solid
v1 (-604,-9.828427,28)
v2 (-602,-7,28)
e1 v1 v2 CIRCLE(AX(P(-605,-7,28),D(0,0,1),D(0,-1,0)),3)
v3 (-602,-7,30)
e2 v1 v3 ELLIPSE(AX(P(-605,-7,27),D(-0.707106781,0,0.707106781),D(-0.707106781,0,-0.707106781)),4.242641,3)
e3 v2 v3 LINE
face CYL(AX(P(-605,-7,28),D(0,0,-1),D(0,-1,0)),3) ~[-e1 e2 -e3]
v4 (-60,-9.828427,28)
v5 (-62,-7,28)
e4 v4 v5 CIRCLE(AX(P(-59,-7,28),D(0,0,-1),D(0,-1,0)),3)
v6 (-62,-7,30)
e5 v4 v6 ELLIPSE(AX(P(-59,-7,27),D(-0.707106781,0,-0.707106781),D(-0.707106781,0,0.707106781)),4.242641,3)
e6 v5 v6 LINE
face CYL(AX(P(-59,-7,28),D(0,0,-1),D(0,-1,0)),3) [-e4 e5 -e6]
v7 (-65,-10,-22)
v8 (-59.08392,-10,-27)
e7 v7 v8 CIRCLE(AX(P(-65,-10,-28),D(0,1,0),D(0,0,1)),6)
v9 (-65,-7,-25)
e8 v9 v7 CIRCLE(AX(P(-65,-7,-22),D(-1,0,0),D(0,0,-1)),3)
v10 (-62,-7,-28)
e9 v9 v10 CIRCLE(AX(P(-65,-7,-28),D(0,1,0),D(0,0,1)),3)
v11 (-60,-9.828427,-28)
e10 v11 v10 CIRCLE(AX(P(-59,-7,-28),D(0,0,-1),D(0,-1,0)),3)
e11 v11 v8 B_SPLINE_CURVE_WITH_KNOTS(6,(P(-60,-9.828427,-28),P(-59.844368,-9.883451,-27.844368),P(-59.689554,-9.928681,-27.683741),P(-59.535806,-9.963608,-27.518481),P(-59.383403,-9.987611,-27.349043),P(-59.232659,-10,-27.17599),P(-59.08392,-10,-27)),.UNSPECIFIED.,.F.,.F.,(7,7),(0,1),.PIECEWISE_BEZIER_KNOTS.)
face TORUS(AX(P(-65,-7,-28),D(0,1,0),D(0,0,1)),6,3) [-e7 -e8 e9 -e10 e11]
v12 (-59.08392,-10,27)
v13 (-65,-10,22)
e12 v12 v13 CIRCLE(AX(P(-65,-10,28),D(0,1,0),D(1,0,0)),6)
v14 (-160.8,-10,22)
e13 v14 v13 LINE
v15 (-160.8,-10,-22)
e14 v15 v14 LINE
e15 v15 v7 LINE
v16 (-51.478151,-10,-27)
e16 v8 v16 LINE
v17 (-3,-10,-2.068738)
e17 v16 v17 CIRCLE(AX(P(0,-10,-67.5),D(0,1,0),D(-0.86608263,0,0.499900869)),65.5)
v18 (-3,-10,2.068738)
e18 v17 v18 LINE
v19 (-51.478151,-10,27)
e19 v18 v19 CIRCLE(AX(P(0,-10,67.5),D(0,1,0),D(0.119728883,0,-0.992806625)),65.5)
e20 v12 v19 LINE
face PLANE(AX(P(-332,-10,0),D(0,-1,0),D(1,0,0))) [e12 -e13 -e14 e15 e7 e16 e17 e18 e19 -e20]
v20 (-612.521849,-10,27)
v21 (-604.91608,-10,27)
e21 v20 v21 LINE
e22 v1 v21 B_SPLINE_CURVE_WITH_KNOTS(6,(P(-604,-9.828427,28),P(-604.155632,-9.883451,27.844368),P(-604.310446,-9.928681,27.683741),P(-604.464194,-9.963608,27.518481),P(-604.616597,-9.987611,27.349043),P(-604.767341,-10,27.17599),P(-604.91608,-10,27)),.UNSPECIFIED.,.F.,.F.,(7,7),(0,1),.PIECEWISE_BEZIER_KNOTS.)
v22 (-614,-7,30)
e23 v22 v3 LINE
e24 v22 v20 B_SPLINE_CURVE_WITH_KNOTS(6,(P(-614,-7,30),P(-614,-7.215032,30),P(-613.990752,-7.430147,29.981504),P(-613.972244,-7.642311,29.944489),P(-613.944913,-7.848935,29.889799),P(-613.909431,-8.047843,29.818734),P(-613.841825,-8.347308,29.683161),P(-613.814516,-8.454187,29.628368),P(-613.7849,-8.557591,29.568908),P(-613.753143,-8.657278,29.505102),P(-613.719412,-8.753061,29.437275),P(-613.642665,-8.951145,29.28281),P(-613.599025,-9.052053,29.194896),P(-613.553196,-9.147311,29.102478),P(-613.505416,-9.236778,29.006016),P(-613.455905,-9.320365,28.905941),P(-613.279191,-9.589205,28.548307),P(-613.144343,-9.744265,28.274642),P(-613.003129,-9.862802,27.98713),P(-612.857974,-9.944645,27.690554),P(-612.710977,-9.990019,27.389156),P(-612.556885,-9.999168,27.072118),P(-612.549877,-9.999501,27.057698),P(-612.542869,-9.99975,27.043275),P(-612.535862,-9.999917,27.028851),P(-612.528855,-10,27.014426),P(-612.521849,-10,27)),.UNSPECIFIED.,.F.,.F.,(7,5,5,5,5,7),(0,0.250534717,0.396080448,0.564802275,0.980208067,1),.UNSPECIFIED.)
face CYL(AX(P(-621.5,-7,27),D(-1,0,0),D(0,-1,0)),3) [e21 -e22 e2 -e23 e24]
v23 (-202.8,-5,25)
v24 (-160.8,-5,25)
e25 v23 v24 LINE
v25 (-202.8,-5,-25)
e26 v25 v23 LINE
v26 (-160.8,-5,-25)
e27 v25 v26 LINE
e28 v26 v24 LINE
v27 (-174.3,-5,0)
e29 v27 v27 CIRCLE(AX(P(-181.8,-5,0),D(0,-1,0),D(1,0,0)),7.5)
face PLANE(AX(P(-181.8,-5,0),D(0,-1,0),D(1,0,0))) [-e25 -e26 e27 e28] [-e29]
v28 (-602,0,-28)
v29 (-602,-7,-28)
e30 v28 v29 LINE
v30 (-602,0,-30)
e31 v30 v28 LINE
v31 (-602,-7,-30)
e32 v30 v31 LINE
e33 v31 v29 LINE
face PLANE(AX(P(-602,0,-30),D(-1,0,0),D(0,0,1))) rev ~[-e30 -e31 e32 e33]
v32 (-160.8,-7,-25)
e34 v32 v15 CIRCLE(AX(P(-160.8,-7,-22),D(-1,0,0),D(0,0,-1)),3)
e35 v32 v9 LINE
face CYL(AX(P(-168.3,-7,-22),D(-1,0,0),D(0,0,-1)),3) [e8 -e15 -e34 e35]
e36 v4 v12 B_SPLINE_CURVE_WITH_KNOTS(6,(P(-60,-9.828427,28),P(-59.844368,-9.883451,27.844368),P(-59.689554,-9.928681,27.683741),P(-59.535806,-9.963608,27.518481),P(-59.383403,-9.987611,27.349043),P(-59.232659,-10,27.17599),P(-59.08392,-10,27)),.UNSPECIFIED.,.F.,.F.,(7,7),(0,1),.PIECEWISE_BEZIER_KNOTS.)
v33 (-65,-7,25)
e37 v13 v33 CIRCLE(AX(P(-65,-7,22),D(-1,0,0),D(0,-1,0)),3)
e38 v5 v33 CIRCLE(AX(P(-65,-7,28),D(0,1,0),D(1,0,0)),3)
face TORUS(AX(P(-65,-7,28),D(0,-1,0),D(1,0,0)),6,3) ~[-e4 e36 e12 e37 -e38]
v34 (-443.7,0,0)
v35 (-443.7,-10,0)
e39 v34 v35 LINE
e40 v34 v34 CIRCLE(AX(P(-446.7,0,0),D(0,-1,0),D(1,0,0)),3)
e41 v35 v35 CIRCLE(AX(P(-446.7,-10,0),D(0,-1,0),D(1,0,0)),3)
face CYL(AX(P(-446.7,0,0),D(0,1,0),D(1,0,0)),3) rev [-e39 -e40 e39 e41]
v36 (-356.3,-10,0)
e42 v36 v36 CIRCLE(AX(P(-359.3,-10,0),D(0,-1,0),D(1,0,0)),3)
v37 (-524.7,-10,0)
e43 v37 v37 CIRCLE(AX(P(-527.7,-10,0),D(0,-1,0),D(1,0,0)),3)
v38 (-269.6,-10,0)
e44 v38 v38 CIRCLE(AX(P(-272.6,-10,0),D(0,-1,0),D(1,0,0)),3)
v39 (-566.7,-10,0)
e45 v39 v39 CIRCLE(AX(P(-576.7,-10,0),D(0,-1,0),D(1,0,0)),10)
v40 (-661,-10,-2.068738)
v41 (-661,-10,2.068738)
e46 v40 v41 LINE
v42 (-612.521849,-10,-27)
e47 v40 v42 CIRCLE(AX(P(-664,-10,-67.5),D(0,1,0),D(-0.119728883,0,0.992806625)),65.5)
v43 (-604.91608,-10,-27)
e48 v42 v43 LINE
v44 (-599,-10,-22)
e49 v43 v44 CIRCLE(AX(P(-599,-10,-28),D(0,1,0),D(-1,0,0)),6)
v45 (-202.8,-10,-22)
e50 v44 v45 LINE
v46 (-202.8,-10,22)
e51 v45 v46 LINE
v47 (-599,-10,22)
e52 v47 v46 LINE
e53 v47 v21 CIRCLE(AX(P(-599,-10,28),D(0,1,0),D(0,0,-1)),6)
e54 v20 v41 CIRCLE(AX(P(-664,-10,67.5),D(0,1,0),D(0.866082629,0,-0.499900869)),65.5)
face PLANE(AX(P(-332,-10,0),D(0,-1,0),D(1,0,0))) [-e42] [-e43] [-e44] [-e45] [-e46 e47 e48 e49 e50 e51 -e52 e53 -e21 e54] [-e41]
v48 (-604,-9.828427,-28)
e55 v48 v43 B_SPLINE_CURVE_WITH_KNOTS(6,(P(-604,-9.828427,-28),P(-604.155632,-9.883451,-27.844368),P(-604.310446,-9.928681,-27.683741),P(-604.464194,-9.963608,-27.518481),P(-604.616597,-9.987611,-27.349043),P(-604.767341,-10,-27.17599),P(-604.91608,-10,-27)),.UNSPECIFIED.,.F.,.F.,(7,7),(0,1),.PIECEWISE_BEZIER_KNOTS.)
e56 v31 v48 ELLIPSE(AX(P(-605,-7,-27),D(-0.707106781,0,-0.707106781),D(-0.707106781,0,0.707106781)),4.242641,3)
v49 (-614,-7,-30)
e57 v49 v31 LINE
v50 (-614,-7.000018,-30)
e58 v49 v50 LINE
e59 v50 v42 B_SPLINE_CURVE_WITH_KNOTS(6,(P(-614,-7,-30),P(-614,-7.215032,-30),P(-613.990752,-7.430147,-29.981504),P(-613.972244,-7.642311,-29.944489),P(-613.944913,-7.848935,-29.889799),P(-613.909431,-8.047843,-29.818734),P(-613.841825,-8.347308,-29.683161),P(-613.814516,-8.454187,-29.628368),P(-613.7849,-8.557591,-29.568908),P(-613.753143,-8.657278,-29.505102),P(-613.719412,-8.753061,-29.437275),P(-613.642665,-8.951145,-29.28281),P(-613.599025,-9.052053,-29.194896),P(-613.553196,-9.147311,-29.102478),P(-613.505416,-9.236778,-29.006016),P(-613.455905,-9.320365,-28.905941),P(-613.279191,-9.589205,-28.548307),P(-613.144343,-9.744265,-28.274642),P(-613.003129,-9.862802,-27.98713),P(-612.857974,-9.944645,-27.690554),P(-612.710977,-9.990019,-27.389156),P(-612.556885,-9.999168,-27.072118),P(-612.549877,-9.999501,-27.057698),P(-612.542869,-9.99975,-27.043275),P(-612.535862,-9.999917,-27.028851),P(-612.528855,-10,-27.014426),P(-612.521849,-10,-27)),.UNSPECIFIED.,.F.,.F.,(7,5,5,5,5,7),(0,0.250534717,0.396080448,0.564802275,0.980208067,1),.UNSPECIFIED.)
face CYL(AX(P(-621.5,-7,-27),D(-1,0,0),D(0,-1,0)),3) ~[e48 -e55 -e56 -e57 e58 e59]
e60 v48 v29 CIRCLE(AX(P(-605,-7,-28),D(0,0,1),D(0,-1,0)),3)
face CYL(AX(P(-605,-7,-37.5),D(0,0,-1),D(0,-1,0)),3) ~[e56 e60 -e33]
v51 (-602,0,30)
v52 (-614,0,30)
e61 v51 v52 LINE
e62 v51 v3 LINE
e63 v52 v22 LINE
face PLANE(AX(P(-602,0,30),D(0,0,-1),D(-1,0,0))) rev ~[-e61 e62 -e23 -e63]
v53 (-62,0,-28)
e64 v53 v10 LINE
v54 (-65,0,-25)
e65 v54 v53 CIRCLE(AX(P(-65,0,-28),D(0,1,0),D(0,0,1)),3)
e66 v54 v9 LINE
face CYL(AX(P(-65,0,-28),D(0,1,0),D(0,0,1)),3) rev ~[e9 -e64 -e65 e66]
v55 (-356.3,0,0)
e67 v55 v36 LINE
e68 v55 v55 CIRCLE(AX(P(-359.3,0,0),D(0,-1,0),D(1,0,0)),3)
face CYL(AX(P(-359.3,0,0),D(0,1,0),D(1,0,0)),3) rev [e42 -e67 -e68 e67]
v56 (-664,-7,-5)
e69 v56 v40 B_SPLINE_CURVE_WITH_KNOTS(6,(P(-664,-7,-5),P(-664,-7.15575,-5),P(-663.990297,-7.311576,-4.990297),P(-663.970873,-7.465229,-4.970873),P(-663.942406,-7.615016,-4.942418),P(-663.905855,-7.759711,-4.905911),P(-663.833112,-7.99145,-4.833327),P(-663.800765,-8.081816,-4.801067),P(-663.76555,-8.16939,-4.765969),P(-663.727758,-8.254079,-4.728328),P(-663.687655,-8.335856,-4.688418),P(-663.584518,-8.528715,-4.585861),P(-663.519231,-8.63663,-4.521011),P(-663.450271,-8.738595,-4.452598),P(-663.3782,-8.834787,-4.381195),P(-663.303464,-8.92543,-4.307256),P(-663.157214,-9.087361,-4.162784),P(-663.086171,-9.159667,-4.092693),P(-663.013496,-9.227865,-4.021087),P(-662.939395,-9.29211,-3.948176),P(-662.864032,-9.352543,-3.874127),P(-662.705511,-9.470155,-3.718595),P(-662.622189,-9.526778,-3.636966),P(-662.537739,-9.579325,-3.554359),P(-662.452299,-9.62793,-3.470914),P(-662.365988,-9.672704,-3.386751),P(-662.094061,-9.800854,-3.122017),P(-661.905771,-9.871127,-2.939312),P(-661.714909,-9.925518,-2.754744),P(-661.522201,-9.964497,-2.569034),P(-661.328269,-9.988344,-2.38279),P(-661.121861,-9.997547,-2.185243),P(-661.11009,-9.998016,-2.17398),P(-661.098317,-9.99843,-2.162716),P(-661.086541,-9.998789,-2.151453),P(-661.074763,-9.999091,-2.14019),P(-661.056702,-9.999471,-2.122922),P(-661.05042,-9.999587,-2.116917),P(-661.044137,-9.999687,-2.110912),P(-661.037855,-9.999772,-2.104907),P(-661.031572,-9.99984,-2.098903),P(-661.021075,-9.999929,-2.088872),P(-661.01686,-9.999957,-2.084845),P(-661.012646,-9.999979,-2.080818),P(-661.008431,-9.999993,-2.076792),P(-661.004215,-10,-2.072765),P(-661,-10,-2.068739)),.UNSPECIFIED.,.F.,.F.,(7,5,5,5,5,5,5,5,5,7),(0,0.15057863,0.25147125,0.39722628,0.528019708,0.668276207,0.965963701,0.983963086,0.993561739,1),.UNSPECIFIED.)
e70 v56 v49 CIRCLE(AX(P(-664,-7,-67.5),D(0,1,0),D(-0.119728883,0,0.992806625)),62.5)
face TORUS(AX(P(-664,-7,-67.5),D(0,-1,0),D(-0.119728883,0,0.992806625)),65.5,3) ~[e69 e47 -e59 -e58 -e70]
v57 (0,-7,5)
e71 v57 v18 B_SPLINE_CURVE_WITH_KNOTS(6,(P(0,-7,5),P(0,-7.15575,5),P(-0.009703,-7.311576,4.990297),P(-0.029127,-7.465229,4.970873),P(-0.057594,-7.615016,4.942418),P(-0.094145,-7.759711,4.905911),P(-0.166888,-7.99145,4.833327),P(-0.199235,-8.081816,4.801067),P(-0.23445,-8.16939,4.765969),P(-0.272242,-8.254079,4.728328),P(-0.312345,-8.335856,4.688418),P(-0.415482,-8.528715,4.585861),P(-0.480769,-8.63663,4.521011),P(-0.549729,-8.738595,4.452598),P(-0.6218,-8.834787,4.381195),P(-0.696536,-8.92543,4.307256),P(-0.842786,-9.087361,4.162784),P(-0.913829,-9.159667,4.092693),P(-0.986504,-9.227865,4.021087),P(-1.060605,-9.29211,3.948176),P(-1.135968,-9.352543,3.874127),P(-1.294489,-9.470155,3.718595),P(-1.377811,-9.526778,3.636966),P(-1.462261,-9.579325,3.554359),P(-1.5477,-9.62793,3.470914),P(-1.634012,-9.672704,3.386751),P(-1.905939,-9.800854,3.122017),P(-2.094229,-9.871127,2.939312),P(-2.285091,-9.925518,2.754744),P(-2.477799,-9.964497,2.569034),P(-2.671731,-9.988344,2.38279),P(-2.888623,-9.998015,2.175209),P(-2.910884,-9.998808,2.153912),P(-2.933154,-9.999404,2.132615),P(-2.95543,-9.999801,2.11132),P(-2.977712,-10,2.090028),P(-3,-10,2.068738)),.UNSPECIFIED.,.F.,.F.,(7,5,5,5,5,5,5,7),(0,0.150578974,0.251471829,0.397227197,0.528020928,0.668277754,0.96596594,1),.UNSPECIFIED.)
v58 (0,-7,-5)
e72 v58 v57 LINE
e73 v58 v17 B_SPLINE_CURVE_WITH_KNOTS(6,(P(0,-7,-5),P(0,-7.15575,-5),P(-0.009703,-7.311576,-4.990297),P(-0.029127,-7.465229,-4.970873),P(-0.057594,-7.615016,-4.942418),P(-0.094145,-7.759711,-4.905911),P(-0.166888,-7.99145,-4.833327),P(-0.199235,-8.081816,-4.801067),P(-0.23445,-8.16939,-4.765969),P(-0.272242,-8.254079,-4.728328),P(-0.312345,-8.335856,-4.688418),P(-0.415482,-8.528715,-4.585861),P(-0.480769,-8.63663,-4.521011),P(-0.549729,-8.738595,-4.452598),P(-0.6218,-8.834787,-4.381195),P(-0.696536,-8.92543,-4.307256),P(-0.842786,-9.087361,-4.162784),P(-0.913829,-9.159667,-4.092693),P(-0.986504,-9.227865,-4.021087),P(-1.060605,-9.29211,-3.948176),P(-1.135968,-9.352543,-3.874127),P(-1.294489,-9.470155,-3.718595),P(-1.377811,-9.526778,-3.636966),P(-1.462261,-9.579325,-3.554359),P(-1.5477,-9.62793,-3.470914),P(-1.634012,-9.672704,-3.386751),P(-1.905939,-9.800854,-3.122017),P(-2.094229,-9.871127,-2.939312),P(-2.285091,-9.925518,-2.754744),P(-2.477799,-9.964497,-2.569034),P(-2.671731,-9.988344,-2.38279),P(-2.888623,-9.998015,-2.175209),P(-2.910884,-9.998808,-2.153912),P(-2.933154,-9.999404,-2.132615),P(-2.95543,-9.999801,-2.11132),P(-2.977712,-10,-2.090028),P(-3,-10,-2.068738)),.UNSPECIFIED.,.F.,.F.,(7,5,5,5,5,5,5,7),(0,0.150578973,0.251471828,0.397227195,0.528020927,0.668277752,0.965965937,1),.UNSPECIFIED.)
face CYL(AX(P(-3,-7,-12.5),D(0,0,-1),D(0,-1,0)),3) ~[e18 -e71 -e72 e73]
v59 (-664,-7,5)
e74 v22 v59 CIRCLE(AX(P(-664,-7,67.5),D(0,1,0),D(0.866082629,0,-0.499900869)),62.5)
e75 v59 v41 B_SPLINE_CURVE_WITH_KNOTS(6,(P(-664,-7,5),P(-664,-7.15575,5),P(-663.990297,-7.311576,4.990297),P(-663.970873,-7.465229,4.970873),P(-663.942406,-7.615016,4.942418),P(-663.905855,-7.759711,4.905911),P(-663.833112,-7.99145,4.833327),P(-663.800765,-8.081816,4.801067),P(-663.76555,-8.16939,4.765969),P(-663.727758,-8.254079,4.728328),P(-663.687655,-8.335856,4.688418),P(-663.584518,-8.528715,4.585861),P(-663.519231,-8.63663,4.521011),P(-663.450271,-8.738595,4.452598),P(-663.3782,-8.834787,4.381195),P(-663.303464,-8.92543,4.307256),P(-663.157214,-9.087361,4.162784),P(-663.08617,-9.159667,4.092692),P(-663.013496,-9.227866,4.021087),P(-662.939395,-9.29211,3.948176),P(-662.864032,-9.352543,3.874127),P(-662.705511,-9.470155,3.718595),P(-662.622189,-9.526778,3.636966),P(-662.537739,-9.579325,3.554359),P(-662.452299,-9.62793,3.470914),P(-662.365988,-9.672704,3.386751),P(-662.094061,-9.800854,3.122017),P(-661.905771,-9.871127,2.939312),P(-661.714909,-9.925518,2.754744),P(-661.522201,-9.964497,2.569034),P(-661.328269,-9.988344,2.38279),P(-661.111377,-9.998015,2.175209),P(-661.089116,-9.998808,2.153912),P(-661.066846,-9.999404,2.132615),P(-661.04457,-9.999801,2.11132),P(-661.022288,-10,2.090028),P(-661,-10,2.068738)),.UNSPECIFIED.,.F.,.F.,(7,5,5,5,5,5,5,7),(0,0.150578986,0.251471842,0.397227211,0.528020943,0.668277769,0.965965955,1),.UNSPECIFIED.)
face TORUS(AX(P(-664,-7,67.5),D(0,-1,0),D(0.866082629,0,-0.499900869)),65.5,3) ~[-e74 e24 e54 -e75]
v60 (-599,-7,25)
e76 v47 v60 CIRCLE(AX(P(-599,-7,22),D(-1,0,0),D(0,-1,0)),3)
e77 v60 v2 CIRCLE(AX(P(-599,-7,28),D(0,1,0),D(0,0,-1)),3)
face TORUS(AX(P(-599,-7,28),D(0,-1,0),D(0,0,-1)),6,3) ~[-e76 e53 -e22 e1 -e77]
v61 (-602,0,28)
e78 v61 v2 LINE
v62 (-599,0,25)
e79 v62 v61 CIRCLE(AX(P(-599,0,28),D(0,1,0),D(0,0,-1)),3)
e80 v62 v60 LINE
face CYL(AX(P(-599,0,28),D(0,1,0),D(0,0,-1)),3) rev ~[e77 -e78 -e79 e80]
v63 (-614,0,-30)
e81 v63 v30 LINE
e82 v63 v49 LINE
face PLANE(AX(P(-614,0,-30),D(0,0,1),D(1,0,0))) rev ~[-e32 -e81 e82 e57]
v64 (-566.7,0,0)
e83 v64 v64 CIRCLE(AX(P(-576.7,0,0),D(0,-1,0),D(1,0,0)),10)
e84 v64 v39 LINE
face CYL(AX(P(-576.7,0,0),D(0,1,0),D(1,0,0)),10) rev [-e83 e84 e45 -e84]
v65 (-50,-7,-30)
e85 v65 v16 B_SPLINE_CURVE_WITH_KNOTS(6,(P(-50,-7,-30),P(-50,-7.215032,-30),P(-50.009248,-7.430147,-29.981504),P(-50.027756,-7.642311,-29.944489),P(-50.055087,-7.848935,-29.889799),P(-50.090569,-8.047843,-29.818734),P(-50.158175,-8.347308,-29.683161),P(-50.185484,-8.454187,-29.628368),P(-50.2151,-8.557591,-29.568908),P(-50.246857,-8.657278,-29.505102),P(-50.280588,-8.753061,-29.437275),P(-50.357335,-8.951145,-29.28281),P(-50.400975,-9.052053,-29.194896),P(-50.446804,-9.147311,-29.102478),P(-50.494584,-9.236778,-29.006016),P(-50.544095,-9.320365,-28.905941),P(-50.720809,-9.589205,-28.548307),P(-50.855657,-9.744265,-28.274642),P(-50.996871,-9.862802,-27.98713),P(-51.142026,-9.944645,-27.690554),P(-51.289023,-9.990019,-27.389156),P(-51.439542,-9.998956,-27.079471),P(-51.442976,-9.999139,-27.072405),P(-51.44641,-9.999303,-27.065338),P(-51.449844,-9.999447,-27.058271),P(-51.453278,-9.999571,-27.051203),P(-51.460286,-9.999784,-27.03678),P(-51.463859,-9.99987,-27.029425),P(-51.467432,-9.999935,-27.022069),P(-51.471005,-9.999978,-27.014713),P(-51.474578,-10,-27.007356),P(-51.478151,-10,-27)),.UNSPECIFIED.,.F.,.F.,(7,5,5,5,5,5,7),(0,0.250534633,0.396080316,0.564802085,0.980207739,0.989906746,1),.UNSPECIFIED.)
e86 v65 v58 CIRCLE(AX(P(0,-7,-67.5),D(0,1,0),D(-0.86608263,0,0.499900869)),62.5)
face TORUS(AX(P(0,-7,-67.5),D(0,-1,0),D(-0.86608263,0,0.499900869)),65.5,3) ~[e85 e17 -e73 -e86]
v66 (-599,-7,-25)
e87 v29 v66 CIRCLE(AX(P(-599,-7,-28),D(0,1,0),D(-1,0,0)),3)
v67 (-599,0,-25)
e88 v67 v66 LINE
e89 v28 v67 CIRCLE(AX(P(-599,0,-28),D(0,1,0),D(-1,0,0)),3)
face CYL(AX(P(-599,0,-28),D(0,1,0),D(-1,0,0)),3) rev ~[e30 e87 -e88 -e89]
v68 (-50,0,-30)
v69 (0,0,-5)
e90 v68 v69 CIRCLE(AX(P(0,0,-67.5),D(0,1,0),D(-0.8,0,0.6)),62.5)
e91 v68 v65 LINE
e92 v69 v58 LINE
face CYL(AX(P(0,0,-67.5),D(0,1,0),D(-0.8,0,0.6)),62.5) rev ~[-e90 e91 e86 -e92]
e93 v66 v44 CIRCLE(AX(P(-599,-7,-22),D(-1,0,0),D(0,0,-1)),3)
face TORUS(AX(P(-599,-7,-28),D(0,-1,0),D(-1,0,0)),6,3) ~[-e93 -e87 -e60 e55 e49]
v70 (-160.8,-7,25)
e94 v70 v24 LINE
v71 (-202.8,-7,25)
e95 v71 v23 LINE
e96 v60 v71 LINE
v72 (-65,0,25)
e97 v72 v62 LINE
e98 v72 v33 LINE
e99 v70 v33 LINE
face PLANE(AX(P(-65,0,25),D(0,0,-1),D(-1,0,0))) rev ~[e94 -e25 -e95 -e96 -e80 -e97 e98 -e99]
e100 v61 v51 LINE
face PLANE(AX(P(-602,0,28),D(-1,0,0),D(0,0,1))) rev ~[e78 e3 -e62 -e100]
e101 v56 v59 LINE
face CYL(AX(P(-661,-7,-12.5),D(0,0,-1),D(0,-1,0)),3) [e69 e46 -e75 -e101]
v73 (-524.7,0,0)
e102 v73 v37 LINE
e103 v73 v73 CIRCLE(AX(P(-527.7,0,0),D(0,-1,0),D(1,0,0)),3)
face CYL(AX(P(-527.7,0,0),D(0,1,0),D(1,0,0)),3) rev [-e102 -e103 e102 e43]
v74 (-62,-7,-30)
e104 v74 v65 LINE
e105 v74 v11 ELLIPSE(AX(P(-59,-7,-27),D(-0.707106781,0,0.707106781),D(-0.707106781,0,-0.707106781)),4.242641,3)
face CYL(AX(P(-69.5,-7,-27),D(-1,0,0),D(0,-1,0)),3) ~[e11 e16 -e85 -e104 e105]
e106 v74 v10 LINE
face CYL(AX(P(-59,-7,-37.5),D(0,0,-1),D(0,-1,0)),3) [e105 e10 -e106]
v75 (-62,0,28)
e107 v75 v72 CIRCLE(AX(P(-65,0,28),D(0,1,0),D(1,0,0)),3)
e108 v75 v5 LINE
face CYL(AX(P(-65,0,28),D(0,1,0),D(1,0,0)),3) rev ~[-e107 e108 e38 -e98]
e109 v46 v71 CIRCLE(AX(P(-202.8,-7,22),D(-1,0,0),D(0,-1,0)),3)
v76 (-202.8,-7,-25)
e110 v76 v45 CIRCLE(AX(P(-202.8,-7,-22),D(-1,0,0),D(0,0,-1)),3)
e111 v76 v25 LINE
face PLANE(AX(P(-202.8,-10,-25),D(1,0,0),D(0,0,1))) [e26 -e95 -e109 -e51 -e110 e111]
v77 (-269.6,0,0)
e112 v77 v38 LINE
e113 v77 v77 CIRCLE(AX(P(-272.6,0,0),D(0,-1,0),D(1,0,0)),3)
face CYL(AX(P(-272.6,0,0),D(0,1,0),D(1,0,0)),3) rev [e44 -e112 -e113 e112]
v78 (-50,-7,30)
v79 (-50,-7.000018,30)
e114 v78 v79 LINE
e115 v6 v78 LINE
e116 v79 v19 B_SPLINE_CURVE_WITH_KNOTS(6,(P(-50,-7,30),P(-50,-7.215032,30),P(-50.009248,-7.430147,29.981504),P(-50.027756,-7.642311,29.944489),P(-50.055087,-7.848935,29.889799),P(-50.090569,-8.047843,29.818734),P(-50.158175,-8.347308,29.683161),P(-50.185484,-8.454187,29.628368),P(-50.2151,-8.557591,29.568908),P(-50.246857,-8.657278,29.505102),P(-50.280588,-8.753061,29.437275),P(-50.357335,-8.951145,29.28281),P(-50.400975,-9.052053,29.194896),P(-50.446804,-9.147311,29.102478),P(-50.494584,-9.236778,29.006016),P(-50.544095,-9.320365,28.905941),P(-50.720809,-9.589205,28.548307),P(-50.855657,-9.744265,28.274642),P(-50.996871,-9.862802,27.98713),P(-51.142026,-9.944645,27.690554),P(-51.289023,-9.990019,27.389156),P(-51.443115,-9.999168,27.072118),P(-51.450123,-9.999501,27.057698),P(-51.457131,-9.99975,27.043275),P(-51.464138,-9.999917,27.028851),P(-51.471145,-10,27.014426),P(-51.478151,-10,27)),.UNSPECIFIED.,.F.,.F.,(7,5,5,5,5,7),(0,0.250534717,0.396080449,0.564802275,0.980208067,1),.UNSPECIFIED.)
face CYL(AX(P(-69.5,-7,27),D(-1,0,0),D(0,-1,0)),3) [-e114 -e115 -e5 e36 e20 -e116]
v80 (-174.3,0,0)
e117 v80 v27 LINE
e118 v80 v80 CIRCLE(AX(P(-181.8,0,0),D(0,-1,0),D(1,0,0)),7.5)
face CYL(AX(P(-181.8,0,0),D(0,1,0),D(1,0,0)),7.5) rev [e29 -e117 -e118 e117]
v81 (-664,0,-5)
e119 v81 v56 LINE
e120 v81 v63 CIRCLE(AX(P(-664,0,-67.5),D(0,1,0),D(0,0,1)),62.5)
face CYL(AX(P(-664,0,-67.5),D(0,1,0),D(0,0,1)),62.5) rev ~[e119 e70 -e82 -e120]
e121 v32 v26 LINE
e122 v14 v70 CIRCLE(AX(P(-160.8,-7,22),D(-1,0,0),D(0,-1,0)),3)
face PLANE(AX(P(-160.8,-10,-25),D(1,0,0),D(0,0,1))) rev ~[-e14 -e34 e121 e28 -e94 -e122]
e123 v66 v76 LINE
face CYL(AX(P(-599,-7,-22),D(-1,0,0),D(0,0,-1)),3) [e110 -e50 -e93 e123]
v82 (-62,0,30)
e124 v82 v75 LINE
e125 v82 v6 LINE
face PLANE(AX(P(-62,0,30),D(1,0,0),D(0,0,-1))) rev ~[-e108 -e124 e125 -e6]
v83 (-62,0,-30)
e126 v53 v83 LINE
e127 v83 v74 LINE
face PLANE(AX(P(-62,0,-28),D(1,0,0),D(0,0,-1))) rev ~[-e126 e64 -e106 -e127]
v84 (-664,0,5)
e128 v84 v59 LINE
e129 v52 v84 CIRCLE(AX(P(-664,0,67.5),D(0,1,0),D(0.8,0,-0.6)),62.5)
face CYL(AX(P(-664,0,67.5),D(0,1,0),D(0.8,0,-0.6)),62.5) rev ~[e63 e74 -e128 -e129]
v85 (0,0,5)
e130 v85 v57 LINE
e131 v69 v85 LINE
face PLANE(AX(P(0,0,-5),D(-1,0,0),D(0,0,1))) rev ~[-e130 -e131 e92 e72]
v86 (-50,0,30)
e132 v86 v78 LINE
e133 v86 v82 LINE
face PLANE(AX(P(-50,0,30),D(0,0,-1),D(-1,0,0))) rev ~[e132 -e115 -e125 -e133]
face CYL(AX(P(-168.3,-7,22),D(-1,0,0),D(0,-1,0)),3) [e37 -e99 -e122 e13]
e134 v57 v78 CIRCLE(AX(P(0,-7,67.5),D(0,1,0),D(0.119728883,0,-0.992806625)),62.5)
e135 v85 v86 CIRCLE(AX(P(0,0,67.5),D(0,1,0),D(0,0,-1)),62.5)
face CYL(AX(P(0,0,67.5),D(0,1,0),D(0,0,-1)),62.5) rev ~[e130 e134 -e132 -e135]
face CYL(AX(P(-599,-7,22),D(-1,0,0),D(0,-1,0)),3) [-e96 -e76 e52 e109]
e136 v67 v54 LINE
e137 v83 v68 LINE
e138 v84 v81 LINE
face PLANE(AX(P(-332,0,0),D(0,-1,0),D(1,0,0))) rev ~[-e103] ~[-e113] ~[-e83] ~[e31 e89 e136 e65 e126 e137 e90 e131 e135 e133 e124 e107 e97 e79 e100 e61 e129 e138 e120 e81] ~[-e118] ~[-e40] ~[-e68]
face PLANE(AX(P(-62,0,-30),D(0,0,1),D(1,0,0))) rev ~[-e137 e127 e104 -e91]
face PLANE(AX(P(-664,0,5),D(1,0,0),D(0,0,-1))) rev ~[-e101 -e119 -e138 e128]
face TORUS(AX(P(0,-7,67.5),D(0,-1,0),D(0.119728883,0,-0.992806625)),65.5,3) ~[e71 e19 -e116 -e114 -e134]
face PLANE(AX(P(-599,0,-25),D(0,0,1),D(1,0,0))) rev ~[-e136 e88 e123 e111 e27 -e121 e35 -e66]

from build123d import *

# Parameters (mm, degrees)
F0_R         = 10
F0_R_2       = 3
F0_R_3       = 7.5
F1_DEPTH     = 10
F2_W         = 42
F2_H         = 50
F2_R         = 7.5
F3_DEPTH     = 5
F4_T1_DEPTH  = 403.7
F4_T3_DEPTH  = 103.3
F4_T5_DEPTH  = 27
F4_T7_DEPTH  = 25
F4_T9_DEPTH  = 27
F4_T11_DEPTH = 9.5
F4_T13_DEPTH = 9.5
F4_T16_ANGLE = 66.8830141294
F4_T18_ANGLE = 66.8830141294
F4_T20_ANGLE = 66.8830141294
F4_T22_ANGLE = 66.8830141294
F4_T24_ANGLE = 90
F4_T26_ANGLE = 90
F4_T28_ANGLE = 90
F4_T30_ANGLE = 90


# Not quite as in the source:
# - a fillet or chamfer that OpenCascade refuses, or shapes differently, is made with other operations: its cross-section is extruded or revolved along the edge and cut away or added


with BuildPart() as f1:
    # F0 (on Front) → F1 (new body)
    with BuildSketch(Plane.XZ):
        with BuildLine():
            Line((0, -5), (0, 0))
            Line((0, 0), (0, 5))
            ThreePointArc((0, 5), (-27.9508497187, 11.5983005625), (-50, 30))
            Line((-50, 30), (-62, 30))
            Line((-62, 30), (-62, 28))
            ThreePointArc((-62, 28), (-62.8786796564, 25.8786796564), (-65, 25))
            Line((-65, 25), (-332, 25))
            Line((-332, 25), (-599, 25))
            ThreePointArc((-599, 25), (-601.1213203436, 25.8786796564), (-602, 28))
            Line((-602, 28), (-602, 30))
            Line((-602, 30), (-614, 30))
            ThreePointArc((-614, 30), (-636.0491502813, 11.5983005625), (-664, 5))
            Line((-664, 5), (-664, 0))
            Line((-664, 0), (-664, -5))
            ThreePointArc((-664, -5), (-636.0491502813, -11.5983005625), (-614, -30))
            Line((-614, -30), (-602, -30))
            Line((-602, -30), (-602, -28))
            ThreePointArc((-602, -28), (-601.1213203436, -25.8786796564), (-599, -25))
            Line((-599, -25), (-332, -25))
            Line((-332, -25), (-65, -25))
            ThreePointArc((-65, -25), (-62.8786796564, -25.8786796564), (-62, -28))
            Line((-62, -28), (-62, -30))
            Line((-62, -30), (-50, -30))
            ThreePointArc((-50, -30), (-27.9508497187, -11.5983005625), (0, -5))
        make_face()
        with Locations((-576.7, 0)):
            Circle(F0_R, mode=Mode.SUBTRACT)
        with Locations((-527.7, 0)):
            Circle(F0_R_2, mode=Mode.SUBTRACT)
        with Locations((-446.7, 0)):
            Circle(F0_R_2, mode=Mode.SUBTRACT)
        with Locations((-359.3, 0)):
            Circle(F0_R_2, mode=Mode.SUBTRACT)
        with Locations((-272.6, 0)):
            Circle(F0_R_2, mode=Mode.SUBTRACT)
        with Locations((-181.8, 0)):
            Circle(F0_R_3, mode=Mode.SUBTRACT)
    extrude(amount=F1_DEPTH)

    # F2 (on face) → F3 (cut)
    with BuildSketch(Plane.XZ.offset(10)):
        with Locations((-181.8, 0)):
            Rectangle(F2_W, F2_H)
        with Locations((-181.8, 0)):
            Circle(F2_R, mode=Mode.SUBTRACT)
    extrude(amount=-F3_DEPTH, mode=Mode.SUBTRACT)

    # F4: fillet of radius 3 on 18 edges, made by hand

    # F4_s2 → F4_t1 (cut)
    with BuildSketch(Plane.YZ.offset(-599)):
        with BuildLine():
            ThreePointArc((-10, 22), (-9.1213203436, 24.1213203436), (-7, 25))
            Line((-7, 25), (-10, 25))
            Line((-10, 25), (-10, 22))
        make_face()
        with BuildLine():
            ThreePointArc((-7, -25), (-9.1213203436, -24.1213203436), (-10, -22))
            Line((-10, -22), (-10, -25))
            Line((-10, -25), (-7, -25))
        make_face()
    extrude(amount=F4_T1_DEPTH, mode=Mode.SUBTRACT)

    # F4_s4 → F4_t3 (cut)
    with BuildSketch(Plane.YZ.offset(-168.3)):
        with BuildLine():
            ThreePointArc((-7, -25), (-9.1213203436, -24.1213203436), (-10, -22))
            Line((-10, -22), (-10, -25))
            Line((-10, -25), (-7, -25))
        make_face()
        with BuildLine():
            ThreePointArc((-10, 22), (-9.1213203436, 24.1213203436), (-7, 25))
            Line((-7, 25), (-10, 25))
            Line((-10, 25), (-10, 22))
        make_face()
    extrude(amount=F4_T3_DEPTH, mode=Mode.SUBTRACT)

    # F4_s6 → F4_t5 (cut)
    with BuildSketch(Plane.YZ.offset(-69.5)):
        with BuildLine():
            ThreePointArc((-10, -27), (-9.1213203436, -29.1213203436), (-7, -30))
            Line((-7, -30), (-10, -30))
            Line((-10, -30), (-10, -27))
        make_face()
        with BuildLine():
            ThreePointArc((-10, 27), (-9.1213203436, 29.1213203436), (-7, 30))
            Line((-7, 30), (-10, 30))
            Line((-10, 30), (-10, 27))
        make_face()
    extrude(amount=F4_T5_DEPTH, mode=Mode.SUBTRACT)

    # F4_s8 → F4_t7 (cut)
    with BuildSketch(Plane.XY.offset(-12.5)):
        with BuildLine():
            ThreePointArc((-3, -10), (-0.8786796564, -9.1213203436), (0, -7))
            Line((0, -7), (0, -10))
            Line((0, -10), (-3, -10))
        make_face()
        with BuildLine():
            ThreePointArc((-661, -10), (-663.1213203436, -9.1213203436), (-664, -7))
            Line((-664, -7), (-664, -10))
            Line((-664, -10), (-661, -10))
        make_face()
    extrude(amount=F4_T7_DEPTH, mode=Mode.SUBTRACT)

    # F4_s10 → F4_t9 (cut)
    with BuildSketch(Plane.YZ.offset(-621.5)):
        with BuildLine():
            ThreePointArc((-10, -27), (-9.1213203436, -29.1213203436), (-7, -30))
            Line((-7, -30), (-10, -30))
            Line((-10, -30), (-10, -27))
        make_face()
        with BuildLine():
            ThreePointArc((-10, 27), (-9.1213203436, 29.1213203436), (-7, 30))
            Line((-7, 30), (-10, 30))
            Line((-10, 30), (-10, 27))
        make_face()
    extrude(amount=F4_T9_DEPTH, mode=Mode.SUBTRACT)

    # F4_s12 → F4_t11 (cut)
    with BuildSketch(Plane.XY.offset(28)):
        with BuildLine():
            ThreePointArc((-605, -10), (-602.8786796564, -9.1213203436), (-602, -7))
            Line((-602, -7), (-602, -10))
            Line((-602, -10), (-605, -10))
        make_face()
        with BuildLine():
            ThreePointArc((-59, -10), (-61.1213203436, -9.1213203436), (-62, -7))
            Line((-62, -7), (-62, -10))
            Line((-62, -10), (-59, -10))
        make_face()
    extrude(amount=F4_T11_DEPTH, mode=Mode.SUBTRACT)

    # F4_s14 → F4_t13 (cut)
    with BuildSketch(Plane.XY.offset(-37.5)):
        with BuildLine():
            ThreePointArc((-605, -10), (-602.8786796564, -9.1213203436), (-602, -7))
            Line((-602, -7), (-602, -10))
            Line((-602, -10), (-605, -10))
        make_face()
        with BuildLine():
            ThreePointArc((-59, -10), (-61.1213203436, -9.1213203436), (-62, -7))
            Line((-62, -7), (-62, -10))
            Line((-62, -10), (-59, -10))
        make_face()
    extrude(amount=F4_T13_DEPTH, mode=Mode.SUBTRACT)

    # F4_s15 → F4_t16 (revolve, cut)
    with BuildSketch(Plane(origin=(-29.2244934886, 0, -50.6316906835), x_dir=(0, 1, 0), z_dir=(-0.4999008689, 0, -0.8660826296))):
        with BuildLine():
            ThreePointArc((-10, -31.7566913469), (-9.1213203436, -29.6353710033), (-7, -28.7566913469))
            Line((-7, -28.7566913469), (-10, -28.7566913469))
            Line((-10, -28.7566913469), (-10, -31.7566913469))
        make_face()
    revolve(axis=Axis((0, -10, -67.5), (0, 1, 0)), revolution_arc=F4_T16_ANGLE, mode=Mode.SUBTRACT)

    # F4_s17 → F4_t18 (revolve, cut)
    with BuildSketch(Plane(origin=(8.0235648794, 0, 0.9676128596), x_dir=(0, 1, 0), z_dir=(0.992806625, 0, 0.1197288826))):
        with BuildLine():
            ThreePointArc((-10, 1.5144471885), (-9.1213203436, 3.6357675321), (-7, 4.5144471885))
            Line((-7, 4.5144471885), (-10, 4.5144471885))
            Line((-10, 4.5144471885), (-10, 1.5144471885))
        make_face()
    revolve(axis=Axis((0, -10, 67.5), (0, 1, 0)), revolution_arc=F4_T18_ANGLE, mode=Mode.SUBTRACT)

    # F4_s19 → F4_t20 (revolve, cut)
    with BuildSketch(Plane(origin=(-662.5051213425, 0, -79.8957177472), x_dir=(0, 1, 0), z_dir=(-0.992806625, 0, -0.1197288826))):
        with BuildLine():
            ThreePointArc((-10, -77.9855308525), (-9.1213203436, -75.864210509), (-7, -74.9855308525))
            Line((-7, -74.9855308525), (-10, -74.9855308525))
            Line((-10, -74.9855308525), (-10, -77.9855308525))
        make_face()
    revolve(axis=Axis((-664, -10, -67.5), (0, 1, 0)), revolution_arc=F4_T20_ANGLE, mode=Mode.SUBTRACT)

    # F4_s21 → F4_t22 (revolve, cut)
    with BuildSketch(Plane(origin=(-136.7096900096, 0, -236.8507341524), x_dir=(0, 1, 0), z_dir=(0.4999008689, 0, 0.8660826296))):
        with BuildLine():
            ThreePointArc((-10, 543.3221746856), (-9.1213203436, 545.4434950292), (-7, 546.3221746856))
            Line((-7, 546.3221746856), (-10, 546.3221746856))
            Line((-10, 546.3221746856), (-10, 543.3221746856))
        make_face()
    revolve(axis=Axis((-664, -10, 67.5), (0, 1, 0)), revolution_arc=F4_T22_ANGLE, mode=Mode.SUBTRACT)

    # F4_s23 → F4_t24 (revolve, cut)
    with BuildSketch(Plane.YZ.offset(-65)):
        with BuildLine():
            ThreePointArc((-7, -25), (-9.1213203436, -24.1213203436), (-10, -22))
            Line((-10, -22), (-10, -25))
            Line((-10, -25), (-7, -25))
        make_face()
    revolve(axis=Axis((-65, -10, -28), (0, 1, 0)), revolution_arc=F4_T24_ANGLE, mode=Mode.SUBTRACT)

    # F4_s25 → F4_t26 (revolve, cut)
    with BuildSketch(Plane.XY.offset(28)):
        with BuildLine():
            ThreePointArc((-59, -10), (-61.1213203436, -9.1213203436), (-62, -7))
            Line((-62, -7), (-62, -10))
            Line((-62, -10), (-59, -10))
        make_face()
    revolve(axis=Axis((-65, -10, 28), (0, 1, 0)), revolution_arc=F4_T26_ANGLE, mode=Mode.SUBTRACT)

    # F4_s27 → F4_t28 (revolve, cut)
    with BuildSketch(Plane.XY.offset(-28)):
        with BuildLine():
            ThreePointArc((-605, -10), (-602.8786796564, -9.1213203436), (-602, -7))
            Line((-602, -7), (-602, -10))
            Line((-602, -10), (-605, -10))
        make_face()
    revolve(axis=Axis((-599, -10, -28), (0, 1, 0)), revolution_arc=F4_T28_ANGLE, mode=Mode.SUBTRACT)

    # F4_s29 → F4_t30 (revolve, cut)
    with BuildSketch(Plane.YZ.offset(-599)):
        with BuildLine():
            ThreePointArc((-10, 22), (-9.1213203436, 24.1213203436), (-7, 25))
            Line((-7, 25), (-10, 25))
            Line((-10, 25), (-10, 22))
        make_face()
    revolve(axis=Axis((-599, -10, 28), (0, 1, 0)), revolution_arc=F4_T30_ANGLE, mode=Mode.SUBTRACT)


solid = f1.part
